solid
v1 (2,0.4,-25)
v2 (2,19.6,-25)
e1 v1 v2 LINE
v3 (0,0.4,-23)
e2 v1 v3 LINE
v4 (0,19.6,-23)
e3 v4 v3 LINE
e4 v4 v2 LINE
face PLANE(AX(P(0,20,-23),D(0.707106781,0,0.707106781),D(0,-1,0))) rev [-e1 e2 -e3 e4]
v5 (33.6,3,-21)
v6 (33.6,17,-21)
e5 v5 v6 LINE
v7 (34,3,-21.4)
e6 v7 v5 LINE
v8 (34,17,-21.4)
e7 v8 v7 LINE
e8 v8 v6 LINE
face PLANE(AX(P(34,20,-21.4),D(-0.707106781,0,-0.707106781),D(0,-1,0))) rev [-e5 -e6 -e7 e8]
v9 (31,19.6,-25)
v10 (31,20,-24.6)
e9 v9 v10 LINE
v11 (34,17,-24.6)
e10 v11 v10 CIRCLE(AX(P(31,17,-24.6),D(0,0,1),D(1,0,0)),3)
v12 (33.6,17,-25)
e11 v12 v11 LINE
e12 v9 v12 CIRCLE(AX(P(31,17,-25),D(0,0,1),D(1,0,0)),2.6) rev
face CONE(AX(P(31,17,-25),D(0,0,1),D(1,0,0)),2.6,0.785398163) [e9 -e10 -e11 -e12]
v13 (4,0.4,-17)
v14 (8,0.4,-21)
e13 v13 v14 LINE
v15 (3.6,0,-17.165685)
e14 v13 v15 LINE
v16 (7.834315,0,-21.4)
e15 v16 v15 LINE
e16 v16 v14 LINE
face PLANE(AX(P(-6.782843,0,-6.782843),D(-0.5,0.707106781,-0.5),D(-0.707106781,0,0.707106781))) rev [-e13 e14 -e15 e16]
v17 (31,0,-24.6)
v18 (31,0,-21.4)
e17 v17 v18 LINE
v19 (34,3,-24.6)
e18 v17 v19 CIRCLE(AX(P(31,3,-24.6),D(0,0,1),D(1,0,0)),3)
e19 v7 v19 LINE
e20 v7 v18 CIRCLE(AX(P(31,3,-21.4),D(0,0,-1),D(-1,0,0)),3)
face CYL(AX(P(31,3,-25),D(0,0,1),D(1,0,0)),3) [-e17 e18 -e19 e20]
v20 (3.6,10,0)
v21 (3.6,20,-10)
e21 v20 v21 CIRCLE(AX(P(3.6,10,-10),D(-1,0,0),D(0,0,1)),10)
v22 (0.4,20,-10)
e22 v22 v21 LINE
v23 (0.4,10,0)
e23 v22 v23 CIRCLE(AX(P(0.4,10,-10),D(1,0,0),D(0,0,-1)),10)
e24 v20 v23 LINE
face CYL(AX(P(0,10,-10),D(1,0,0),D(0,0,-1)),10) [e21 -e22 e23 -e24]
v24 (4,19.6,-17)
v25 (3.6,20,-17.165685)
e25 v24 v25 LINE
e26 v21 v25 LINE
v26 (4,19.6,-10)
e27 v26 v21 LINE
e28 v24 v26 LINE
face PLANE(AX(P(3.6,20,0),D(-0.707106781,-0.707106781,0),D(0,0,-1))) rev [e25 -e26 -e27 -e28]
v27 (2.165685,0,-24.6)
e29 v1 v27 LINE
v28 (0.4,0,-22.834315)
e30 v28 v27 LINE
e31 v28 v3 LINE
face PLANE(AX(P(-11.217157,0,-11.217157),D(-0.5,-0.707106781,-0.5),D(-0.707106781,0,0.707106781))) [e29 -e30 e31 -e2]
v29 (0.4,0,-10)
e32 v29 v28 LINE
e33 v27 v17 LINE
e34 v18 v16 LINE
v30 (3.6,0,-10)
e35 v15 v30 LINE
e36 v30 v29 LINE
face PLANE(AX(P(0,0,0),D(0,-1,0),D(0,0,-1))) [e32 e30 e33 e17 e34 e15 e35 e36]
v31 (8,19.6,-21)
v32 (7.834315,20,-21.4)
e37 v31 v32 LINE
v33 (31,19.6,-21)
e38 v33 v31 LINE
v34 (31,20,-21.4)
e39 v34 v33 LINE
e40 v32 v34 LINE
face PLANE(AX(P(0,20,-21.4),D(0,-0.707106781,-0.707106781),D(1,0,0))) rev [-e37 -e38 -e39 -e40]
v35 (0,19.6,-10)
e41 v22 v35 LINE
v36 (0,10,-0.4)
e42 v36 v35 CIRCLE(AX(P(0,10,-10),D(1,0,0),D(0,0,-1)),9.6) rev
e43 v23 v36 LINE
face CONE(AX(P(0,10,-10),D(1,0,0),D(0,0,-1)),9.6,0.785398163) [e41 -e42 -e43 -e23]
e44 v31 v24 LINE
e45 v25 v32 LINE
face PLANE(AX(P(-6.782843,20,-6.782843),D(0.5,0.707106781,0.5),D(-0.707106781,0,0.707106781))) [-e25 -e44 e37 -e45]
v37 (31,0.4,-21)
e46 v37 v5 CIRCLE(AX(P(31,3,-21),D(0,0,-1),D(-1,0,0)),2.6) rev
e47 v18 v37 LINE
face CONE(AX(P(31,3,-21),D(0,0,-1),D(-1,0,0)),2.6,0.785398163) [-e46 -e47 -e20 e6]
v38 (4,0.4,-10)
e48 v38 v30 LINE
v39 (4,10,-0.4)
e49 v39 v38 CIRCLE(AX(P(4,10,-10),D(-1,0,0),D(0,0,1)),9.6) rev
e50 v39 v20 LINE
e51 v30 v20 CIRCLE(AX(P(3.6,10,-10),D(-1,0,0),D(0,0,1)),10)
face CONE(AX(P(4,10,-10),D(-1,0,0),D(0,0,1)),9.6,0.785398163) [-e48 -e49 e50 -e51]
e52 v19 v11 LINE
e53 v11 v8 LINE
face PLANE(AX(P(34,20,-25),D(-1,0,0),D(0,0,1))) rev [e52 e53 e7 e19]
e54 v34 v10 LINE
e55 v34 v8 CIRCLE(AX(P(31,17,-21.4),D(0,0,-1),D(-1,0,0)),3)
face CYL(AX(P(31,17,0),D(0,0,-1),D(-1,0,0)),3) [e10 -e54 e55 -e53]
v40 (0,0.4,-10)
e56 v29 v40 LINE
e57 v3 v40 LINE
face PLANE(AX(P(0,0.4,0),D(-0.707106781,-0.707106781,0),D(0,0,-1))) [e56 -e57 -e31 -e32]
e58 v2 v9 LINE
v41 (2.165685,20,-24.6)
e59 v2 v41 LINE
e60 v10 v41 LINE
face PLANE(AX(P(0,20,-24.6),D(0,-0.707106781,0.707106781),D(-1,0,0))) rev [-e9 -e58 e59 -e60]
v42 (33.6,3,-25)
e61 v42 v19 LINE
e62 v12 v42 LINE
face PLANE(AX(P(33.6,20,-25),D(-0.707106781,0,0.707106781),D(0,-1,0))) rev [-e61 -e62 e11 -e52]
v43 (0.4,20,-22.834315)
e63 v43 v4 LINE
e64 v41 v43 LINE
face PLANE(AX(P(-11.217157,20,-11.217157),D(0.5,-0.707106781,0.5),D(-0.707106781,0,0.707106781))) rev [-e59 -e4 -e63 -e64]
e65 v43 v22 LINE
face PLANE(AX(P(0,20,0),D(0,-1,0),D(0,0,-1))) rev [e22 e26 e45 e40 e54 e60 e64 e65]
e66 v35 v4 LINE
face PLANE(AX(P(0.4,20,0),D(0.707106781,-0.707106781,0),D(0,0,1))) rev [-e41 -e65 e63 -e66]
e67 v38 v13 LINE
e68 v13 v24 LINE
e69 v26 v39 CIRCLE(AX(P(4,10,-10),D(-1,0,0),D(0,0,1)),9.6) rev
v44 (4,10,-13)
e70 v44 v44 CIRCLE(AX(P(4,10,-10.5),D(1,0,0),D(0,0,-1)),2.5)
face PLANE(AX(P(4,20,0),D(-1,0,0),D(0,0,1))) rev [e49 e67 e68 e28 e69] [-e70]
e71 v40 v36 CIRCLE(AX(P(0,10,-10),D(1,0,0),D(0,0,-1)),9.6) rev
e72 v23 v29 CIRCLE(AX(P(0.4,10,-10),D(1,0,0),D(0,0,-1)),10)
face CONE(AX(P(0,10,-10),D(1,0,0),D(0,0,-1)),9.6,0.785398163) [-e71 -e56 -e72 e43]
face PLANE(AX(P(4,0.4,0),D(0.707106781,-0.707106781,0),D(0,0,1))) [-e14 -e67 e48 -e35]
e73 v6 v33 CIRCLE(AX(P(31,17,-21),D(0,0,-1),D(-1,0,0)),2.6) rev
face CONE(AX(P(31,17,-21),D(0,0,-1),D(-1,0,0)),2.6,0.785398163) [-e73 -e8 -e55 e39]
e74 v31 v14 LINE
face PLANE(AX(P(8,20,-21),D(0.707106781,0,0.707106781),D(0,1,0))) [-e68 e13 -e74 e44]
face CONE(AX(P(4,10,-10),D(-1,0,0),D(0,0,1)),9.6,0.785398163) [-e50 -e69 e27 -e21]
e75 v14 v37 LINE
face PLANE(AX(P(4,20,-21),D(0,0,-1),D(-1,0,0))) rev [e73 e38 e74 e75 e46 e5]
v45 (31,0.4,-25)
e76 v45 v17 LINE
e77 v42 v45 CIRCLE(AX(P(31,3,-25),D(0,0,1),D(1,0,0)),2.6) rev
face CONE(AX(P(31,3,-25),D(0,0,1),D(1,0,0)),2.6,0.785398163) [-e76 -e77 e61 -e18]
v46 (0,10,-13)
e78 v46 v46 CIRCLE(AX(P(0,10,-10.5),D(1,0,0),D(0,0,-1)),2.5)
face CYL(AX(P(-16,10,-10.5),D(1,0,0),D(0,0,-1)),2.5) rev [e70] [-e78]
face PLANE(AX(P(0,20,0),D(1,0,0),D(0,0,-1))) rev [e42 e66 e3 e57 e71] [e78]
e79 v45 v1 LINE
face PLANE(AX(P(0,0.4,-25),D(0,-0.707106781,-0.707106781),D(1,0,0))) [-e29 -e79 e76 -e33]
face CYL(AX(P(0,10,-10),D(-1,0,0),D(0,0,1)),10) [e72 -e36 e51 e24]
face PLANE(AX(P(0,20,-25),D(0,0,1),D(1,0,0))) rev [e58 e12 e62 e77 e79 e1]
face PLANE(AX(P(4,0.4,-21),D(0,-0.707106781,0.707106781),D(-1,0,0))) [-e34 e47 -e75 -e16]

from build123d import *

# Parameters (mm, degrees)
EXTRUDE_1_DEPTH     = 20
SKETCH_2_R          = 2.5
CUT_EXTRUDE_1_DEPTH = 20
FILLET_1_R          = 10
CHAMFER_1_SIZE      = 4
CHAMFER_2_SIZE      = 2
FILLET_2_R          = 3
CHAMFER_3_SIZE      = 0.4


with BuildPart() as part:
    # 草图1 → 凸台-拉伸1 (new body)
    with BuildSketch(Plane(origin=(0, 0, 0), x_dir=(1, 0, 0), z_dir=(0, 1, 0))):
        Polygon((0, 0), (4, 0), (4, 21), (34, 21), (34, 25), (4, 25), (0, 25), align=None)
    extrude(amount=EXTRUDE_1_DEPTH)

    # 草图2 → 切除-拉伸1 (cut)
    with BuildSketch(Plane(origin=(4, 0, 0), x_dir=(0, 0, -1), z_dir=(1, 0, 0))):
        with Locations((10.5, 10)):
            Circle(SKETCH_2_R)
    extrude(amount=-CUT_EXTRUDE_1_DEPTH, mode=Mode.SUBTRACT)

    # 圆角1
    fillet_1_edges = [part.edges().sort_by_distance(p)[0] for p in [
        (2, 0, 0),
        (2, 20, 0),
    ]]
    fillet(fillet_1_edges, radius=FILLET_1_R - 0.0001)  # a hair under: the kernel refuses the full size

    # 倒角1
    chamfer_1_edges = [part.edges().sort_by_distance(p)[0] for p in [
        (4, 10, -21),
    ]]
    chamfer(chamfer_1_edges, length=CHAMFER_1_SIZE)

    # 倒角2
    chamfer_2_edges = [part.edges().sort_by_distance(p)[0] for p in [
        (0, 10, -25),
    ]]
    chamfer(chamfer_2_edges, length=CHAMFER_2_SIZE)

    # 圆角2
    fillet_2_edges = [part.edges().sort_by_distance(p)[0] for p in [
        (34, 20, -23),
        (34, 0, -23),
    ]]
    fillet(fillet_2_edges, radius=FILLET_2_R)

    # 倒角3
    chamfer_3_edges = [part.edges().sort_by_distance(p)[0] for p in [
        (4, 0, -13.49995),
        (4, 20, -13.49995),
        (4, 17.071097101, -2.928902899),
        (4, 2.928902899, -2.928902899),
        (0, 17.071097101, -2.928902899),
        (0, 2.928902899, -2.928902899),
        (19.5, 0, -21),
        (19.5, 20, -21),
        (6, 0, -19),
        (6, 20, -19),
        (0, 0, -16.49995),
        (0, 20, -16.49995),
        (1, 0, -24),
        (1, 20, -24),
        (34, 10, -25),
        (34, 10, -21),
        (16.5, 0, -25),
        (16.5, 20, -25),
        (33.121320344, 19.121320344, -25),
        (33.121320344, 0.878679656, -25),
        (33.121320344, 19.121320344, -21),
        (33.121320344, 0.878679656, -21),
    ]]
    chamfer(chamfer_3_edges, length=CHAMFER_3_SIZE)


solid = part.part
